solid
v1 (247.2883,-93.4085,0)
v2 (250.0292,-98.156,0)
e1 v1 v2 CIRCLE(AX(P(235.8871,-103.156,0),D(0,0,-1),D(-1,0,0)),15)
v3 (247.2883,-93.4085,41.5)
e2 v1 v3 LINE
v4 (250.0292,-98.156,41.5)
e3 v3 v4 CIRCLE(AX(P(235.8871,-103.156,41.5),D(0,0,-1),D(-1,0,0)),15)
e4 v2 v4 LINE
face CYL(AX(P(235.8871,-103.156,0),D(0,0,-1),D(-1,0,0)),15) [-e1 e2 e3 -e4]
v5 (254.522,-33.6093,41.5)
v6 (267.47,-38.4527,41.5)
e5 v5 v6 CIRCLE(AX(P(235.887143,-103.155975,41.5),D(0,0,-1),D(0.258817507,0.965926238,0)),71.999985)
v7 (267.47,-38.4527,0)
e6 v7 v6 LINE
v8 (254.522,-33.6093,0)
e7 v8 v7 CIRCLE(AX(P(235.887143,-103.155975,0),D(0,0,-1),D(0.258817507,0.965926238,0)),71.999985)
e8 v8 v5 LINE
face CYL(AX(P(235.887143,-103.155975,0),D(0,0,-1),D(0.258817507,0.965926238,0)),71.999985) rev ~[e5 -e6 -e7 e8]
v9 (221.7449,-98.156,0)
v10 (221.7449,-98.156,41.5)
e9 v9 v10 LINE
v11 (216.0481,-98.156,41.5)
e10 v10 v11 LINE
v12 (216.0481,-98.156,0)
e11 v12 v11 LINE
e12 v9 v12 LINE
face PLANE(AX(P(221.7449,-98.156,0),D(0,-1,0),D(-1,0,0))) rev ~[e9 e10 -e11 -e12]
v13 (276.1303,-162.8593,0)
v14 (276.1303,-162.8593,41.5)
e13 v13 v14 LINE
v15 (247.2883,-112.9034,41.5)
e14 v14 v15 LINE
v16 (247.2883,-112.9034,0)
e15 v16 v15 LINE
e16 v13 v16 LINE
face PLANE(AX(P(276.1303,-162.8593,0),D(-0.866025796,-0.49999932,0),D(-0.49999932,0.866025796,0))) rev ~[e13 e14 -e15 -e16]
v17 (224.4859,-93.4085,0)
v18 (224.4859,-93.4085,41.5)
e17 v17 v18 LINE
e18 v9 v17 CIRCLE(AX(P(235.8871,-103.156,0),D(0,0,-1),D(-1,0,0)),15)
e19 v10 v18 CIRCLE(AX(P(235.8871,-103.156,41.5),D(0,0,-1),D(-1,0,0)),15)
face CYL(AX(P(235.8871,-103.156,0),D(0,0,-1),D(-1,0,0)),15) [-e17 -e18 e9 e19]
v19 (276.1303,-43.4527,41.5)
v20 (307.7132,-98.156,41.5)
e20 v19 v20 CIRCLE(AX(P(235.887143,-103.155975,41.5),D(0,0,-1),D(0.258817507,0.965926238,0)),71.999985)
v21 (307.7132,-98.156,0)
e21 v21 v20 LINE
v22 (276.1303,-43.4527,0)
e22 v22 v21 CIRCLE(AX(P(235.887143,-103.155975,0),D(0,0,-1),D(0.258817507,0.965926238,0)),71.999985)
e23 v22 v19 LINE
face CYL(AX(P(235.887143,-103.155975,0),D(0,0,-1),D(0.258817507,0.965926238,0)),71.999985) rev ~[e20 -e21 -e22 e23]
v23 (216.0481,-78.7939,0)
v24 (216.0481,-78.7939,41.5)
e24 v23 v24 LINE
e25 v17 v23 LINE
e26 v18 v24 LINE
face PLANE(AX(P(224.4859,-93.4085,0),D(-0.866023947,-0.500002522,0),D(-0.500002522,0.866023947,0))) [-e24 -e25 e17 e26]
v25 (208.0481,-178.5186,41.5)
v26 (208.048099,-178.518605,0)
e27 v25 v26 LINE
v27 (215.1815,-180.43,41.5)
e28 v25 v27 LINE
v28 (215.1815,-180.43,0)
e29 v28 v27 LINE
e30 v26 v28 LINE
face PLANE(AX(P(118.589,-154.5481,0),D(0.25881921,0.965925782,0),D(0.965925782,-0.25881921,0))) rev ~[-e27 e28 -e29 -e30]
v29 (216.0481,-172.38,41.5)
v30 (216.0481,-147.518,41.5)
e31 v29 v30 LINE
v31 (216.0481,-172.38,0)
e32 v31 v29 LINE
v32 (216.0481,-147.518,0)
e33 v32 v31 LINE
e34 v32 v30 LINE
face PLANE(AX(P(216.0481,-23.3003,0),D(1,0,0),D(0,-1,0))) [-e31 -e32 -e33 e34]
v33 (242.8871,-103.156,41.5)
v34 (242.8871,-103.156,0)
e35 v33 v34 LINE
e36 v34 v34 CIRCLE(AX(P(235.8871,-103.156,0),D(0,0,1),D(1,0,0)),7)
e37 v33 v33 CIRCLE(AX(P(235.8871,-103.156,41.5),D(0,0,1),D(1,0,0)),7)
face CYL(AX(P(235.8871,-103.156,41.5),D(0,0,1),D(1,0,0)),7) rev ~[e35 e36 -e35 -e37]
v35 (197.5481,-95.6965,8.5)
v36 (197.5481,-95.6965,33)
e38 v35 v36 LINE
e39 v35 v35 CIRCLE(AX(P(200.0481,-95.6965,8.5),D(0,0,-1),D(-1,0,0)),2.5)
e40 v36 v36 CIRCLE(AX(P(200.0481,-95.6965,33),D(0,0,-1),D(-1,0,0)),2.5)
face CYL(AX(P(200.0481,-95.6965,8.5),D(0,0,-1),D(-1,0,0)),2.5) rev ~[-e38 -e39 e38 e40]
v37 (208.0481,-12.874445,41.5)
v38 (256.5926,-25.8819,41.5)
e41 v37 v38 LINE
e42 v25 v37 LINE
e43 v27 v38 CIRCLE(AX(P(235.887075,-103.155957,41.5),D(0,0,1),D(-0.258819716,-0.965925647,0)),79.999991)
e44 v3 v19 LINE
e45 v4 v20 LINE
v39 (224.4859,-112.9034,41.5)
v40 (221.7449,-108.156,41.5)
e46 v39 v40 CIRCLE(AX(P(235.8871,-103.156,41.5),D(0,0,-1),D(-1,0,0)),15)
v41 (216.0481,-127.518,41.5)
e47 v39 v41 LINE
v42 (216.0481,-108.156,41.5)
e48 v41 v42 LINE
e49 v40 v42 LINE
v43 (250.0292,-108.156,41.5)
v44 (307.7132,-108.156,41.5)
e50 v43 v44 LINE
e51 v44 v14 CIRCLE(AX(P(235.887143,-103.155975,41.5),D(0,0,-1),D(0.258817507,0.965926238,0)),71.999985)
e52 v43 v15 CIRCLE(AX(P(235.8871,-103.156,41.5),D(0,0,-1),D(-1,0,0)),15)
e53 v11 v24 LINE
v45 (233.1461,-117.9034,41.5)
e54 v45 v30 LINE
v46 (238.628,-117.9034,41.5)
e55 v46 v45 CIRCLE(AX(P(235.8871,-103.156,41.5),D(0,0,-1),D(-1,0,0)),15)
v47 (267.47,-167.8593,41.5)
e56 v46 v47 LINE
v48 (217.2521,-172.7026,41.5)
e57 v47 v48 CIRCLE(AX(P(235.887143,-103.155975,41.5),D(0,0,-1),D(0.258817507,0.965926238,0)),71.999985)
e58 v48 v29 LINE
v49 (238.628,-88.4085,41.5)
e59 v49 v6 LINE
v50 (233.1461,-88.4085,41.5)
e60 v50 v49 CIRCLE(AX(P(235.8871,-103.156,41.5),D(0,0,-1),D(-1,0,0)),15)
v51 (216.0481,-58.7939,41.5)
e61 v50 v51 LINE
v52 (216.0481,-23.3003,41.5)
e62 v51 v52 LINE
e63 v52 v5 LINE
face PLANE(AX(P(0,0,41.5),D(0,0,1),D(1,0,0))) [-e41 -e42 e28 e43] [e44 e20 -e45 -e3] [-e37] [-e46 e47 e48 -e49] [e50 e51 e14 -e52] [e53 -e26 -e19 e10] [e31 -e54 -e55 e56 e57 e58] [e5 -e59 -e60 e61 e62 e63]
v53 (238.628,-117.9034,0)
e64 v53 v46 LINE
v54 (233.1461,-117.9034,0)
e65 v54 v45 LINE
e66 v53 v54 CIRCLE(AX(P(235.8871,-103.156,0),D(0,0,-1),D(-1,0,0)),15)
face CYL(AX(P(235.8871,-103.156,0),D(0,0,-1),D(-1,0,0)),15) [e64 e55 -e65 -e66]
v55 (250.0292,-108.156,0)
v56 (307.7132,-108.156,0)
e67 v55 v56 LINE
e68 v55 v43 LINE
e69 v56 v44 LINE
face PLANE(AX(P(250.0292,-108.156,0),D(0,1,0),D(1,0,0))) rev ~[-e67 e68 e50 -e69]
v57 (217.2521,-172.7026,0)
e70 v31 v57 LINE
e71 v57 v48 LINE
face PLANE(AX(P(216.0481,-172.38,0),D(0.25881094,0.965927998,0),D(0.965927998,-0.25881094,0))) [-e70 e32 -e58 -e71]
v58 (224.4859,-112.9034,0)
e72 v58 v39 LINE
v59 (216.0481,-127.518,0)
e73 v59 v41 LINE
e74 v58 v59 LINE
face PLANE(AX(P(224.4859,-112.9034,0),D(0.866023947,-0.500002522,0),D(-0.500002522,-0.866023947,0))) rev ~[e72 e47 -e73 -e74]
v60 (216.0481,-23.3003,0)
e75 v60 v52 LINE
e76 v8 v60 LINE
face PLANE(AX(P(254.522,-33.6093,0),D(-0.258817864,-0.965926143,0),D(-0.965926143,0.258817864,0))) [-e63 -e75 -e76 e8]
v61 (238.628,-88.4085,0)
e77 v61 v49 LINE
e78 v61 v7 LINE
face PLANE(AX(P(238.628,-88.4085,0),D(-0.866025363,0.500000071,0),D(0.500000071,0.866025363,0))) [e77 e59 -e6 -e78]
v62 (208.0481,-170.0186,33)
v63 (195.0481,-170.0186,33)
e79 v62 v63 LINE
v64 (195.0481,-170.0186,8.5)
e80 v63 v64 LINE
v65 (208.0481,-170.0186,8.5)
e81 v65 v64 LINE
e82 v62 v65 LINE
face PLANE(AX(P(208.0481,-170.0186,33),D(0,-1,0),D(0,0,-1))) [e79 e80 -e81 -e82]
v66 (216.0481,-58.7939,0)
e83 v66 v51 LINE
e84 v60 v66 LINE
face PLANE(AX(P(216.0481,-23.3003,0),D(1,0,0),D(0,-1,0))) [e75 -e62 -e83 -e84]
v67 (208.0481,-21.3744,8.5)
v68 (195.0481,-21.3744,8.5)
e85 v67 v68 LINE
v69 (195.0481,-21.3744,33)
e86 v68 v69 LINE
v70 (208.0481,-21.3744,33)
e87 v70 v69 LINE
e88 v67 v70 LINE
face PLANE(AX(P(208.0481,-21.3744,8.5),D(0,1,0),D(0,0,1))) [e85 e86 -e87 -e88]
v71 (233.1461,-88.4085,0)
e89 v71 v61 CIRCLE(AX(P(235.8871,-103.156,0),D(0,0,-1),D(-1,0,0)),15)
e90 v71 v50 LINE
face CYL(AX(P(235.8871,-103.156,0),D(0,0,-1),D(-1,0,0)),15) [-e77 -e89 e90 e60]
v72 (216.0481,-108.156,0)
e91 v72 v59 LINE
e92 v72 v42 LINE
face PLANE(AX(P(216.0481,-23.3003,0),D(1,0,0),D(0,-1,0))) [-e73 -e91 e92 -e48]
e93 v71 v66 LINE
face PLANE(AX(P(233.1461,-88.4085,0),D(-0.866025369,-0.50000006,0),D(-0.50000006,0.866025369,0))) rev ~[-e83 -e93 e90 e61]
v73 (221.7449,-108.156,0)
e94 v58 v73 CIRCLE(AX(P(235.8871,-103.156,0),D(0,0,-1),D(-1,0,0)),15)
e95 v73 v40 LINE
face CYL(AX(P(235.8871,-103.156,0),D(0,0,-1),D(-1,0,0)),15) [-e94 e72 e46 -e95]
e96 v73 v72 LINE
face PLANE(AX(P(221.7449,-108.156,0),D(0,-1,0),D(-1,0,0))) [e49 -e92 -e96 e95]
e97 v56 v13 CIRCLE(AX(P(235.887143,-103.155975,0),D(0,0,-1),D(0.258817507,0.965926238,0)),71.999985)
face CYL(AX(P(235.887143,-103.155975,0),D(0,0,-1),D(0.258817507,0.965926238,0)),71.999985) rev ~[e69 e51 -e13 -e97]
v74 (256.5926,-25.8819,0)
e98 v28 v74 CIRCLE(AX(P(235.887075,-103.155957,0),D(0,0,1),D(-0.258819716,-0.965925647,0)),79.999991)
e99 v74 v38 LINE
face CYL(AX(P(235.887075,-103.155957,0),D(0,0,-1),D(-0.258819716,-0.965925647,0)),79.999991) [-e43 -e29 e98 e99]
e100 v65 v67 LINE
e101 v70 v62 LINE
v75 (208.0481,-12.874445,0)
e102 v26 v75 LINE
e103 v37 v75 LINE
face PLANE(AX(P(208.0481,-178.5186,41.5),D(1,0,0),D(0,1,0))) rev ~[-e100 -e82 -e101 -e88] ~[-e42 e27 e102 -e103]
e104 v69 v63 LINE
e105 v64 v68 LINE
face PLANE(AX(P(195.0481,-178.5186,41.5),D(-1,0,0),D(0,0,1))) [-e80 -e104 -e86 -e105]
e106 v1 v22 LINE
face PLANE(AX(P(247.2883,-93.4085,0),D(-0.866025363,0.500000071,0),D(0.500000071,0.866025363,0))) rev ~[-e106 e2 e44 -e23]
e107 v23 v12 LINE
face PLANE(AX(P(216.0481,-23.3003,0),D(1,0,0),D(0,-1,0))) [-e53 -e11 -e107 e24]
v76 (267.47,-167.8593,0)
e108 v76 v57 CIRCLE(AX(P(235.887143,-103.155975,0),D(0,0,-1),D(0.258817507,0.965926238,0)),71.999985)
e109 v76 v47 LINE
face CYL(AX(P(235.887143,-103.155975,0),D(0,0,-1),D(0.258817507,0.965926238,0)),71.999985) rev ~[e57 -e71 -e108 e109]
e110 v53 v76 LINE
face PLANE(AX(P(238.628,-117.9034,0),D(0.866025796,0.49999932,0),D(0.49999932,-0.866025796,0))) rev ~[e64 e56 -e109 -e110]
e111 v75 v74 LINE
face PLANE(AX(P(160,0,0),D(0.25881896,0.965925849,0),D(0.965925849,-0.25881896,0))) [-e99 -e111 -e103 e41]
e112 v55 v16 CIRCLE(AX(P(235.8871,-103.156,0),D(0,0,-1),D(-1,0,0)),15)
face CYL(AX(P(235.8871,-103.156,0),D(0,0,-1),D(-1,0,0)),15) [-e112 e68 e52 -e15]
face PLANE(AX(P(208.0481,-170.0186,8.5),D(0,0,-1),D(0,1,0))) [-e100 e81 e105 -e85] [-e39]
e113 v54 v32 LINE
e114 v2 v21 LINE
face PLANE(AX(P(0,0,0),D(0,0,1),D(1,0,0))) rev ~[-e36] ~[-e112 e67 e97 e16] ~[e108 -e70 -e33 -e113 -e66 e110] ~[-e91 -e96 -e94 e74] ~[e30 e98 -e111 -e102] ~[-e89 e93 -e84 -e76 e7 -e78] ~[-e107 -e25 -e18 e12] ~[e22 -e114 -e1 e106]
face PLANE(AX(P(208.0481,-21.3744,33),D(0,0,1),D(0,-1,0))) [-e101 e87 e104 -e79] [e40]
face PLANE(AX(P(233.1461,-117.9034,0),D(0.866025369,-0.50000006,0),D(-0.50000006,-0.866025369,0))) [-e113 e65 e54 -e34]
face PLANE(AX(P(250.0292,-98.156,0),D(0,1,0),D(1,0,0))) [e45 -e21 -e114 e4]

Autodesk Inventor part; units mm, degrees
ref_plane "YZ Plane" through (0, 0, 0) normal (1, 0, 0) x (0, 1, 0)
ref_plane "XZ Plane" through (0, 0, 0) normal (0, 1, 0) x (-1, 0, 0)
ref_plane "XY Plane" through (0, 0, 0) normal (0, 0, 1) x (1, 0, 0)
sketch "Sketch1" plane through (0, 0, 0) normal (0, 0, 1) x (1, 0, 0)
  line L0 (0, 0) -> (160, 0)
  line L1 (160, 0) -> (118.589, -154.5481) construction
  line L2 (0, 0) -> (41.411, -154.5481) construction
  line L3 (41.411, -154.5481) -> (118.589, -154.5481)
  circle A0 centre (235.8871, -103.156) radius 80 construction
  line L4 (160, 0) -> (256.5926, -25.8819)
  line L5 (118.589, -154.5481) -> (215.1815, -180.43)
  arc A1 (215.1815, -180.43) -> (256.5926, -25.8819) centre (235.8871, -103.156) ccw
  circle A2 centre (-75.8871, -103.156) radius 80 construction
  line L6 (0, 0) -> (-96.5926, -25.8819)
  line L7 (41.411, -154.5481) -> (-55.1815, -180.43)
  arc A3 (-96.5926, -25.8819) -> (-55.1815, -180.43) centre (-75.8871, -103.156) ccw
  dimension "d0" = 160
  dimension "d1" = 160
  dimension "d2" = 160
  dimension "d3" = 75
  dimension "d4" = 75
  dimension "d5" = 160
  dimension "d6" = 100
  dimension "d7" = 160
  dimension "d9" = 100
extrude "Extrusion1" add sketch "Sketch1" along normal blind 41.5
sketch "Sketch2" plane through (0, 0, 41.5) normal (0, 0, 1) x (1, 0, 0)
  line L0 (-26.5, -133) -> (186.5, -133)
  line L1 (186.5, -133) -> (186.5, -20)
  line L2 (186.5, -20) -> (-26.5, -20)
  line L3 (-26.5, -20) -> (-26.5, -133)
  line L4 (160, 0) -> (0, 0) projected
  point P0 (80, -20)
  point P1 (80, 0)
  dimension "d12" = 213
  dimension "d13" = 113
  dimension "d14" = 20
extrude "Extrusion2" cut sketch "Sketch2" against normal through all
sketch "Sketch3" plane through (0, 0, 41.5) normal (0, 0, 1) x (1, 0, 0)
  line L0 (-26.5, -133) -> (-26.5, -20) construction
  line L1 (-26.5, -20) -> (186.5, -20) construction
  line L2 (186.5, -20) -> (186.5, -133) construction
  line L3 (186.5, -133) -> (-26.5, -133) construction
  line L4 (-48.0481, 1.5481) -> (-48.0481, -154.5481) construction
  line L5 (-48.0481, -154.5481) -> (208.0481, -154.5481) construction
  line L6 (208.0481, -154.5481) -> (208.0481, 1.5481) construction
  line L7 (208.0481, 1.5481) -> (-48.0481, 1.5481) construction
  line L8 (41.411, -154.5481) -> (118.589, -154.5481) construction
  line L9 (-48.0481, 1.5481) -> (-48.0481, -178.5186) construction
  line L10 (-55.1815, -180.43) -> (41.411, -154.5481) construction
  line L11 (208.0481, 1.5481) -> (208.0481, -178.5186) construction
  line L12 (118.589, -154.5481) -> (215.1815, -180.43) construction
  line L13 (-48.0481, -178.5186) -> (208.0481, -178.5186) construction
  line L14 (-48.0481, 1.5481) -> (208.0481, 1.5481) construction
  line L15 (160, 0) -> (256.5926, -25.8819) construction
  line L16 (208.2963, -12.941) -> (208.0481, -178.5186)
  line L17 (208.2963, -12.941) -> (256.5926, -25.8819)
  line L18 (208.0481, -178.5186) -> (215.1815, -180.43)
  arc A0 (215.1815, -180.43) -> (256.5926, -25.8819) centre (235.8871, -103.156) ccw
  line L19 (208.0481, 1.5481) -> (-166.9519, 1.5481)
  line L20 (-166.9519, 1.5481) -> (-166.9519, -188.4519)
  line L21 (-166.9519, -188.4519) -> (208.0481, -188.4519)
  line L22 (208.0481, -188.4519) -> (208.0481, 1.5481)
  point P0 (0, 0)
  point P1 (80, -154.5481)
  dimension "d17" = 190
  dimension "d18" = 375
extrude "Extrusion3" cut sketch "Sketch3" against normal through all contours L22 L21 L20 L19
sketch "Sketch4" plane through (0, 0, 41.5) normal (0, 0, 1) x (1, 0, 0)
  arc A0 (215.1815, -180.43) -> (256.5926, -25.8819) centre (235.8871, -103.156) ccw projected
  circle A1 centre (235.8871, -103.156) radius 7
  point P0 (0, 0)
  dimension "d21" = 14
extrude "Extrusion4" cut sketch "Sketch4" against normal through all
sketch "Sketch5" plane through (208.0481, -178.5186, 41.5) normal (-1, 0, 0) x (0, 0, 1)
  line L0 (-41.5, 165.6442) -> (0, 165.6442) projected
  line L1 (-41.5, 0) -> (-41.5, 165.6442) projected
  line L2 (0, 0) -> (-41.5, 0) projected
  line L3 (0, 165.6442) -> (0, 0) projected
  line L4 (-33, 157.1442) -> (-8.5, 157.1442)
  line L5 (-8.5, 157.1442) -> (-8.5, 8.5)
  line L6 (-8.5, 8.5) -> (-33, 8.5)
  line L7 (-33, 8.5) -> (-33, 157.1442)
  point P0 (-41.5, 178.5186)
  dimension "d24" = 8.5
extrude "Extrusion5" add sketch "Sketch5" along normal blind 13 contours L4 L5 L6 L7
sketch "Sketch6" plane through (208.0481, -170.0186, 8.5) normal (0, 0, -1) x (-1, 0, 0)
  circle A0 centre (8, 74.3221) radius 2.5
  line L0 (0, -8.5) -> (0, 157.1442) projected
  point P0 (208.0481, 170.0186)
  point P1 (0, 74.3221)
  dimension "d27" = 5
  dimension "d28" = 8
extrude "Extrusion6" cut sketch "Sketch6" against normal through all
sketch "Sketch7" plane through (0, 0, 0) normal (0, 0, -1) x (-1, 0, 0)
  circle A0 centre (-235.8871, -103.156) radius 7 projected
  line L0 (-208.0481, -178.5186) -> (-208.0481, -12.8745) projected
  line L1 (-208.0481, -12.8745) -> (-256.5926, -25.8819) projected
  arc A1 (-256.5926, -25.8819) -> (-215.1815, -180.43) centre (-235.8871, -103.156) ccw projected
  line L2 (-215.1815, -180.43) -> (-208.0481, -178.5186) projected
  line L3 (-254.522, -33.6093) -> (-216.0481, -23.3003)
  line L4 (-216.0481, -23.3003) -> (-216.0481, -172.38)
  line L5 (-216.0481, -172.38) -> (-217.2521, -172.7026)
  arc A2 (-254.522, -33.6093) -> (-217.2521, -172.7026) centre (-235.8871, -103.156) ccw
  circle A3 centre (-235.8871, -103.156) radius 15
  point P0 (0, 0)
  dimension "d31" = 8
  dimension "d32" = 8
extrude "Extrusion7" cut sketch "Sketch7" against normal through all contours L3 L4 L5 A2
sketch "Sketch8" plane through (0, 0, 0) normal (0, 0, -1) x (-1, 0, 0)
  circle A0 centre (-235.8871, -103.156) radius 7 construction
  circle A1 centre (-235.8871, -103.156) radius 15 construction
  line L0 (-235.8871, -103.156) -> (-159.7277, -103.156) construction
  line L1 (-221.7449, -98.156) -> (-123.6167, -98.156) construction
  line L2 (-221.7449, -108.156) -> (-123.6167, -108.156) construction
  line L3 (-233.1461, -88.4085) -> (-184.082, -3.427) construction
  line L4 (-224.4859, -93.4085) -> (-175.4217, -8.427) construction
  line L5 (-247.2883, -93.4085) -> (-296.3524, -8.427) construction
  line L6 (-238.628, -88.4085) -> (-287.6921, -3.427) construction
  line L7 (-250.0292, -108.156) -> (-348.1575, -108.156) construction
  line L8 (-250.0292, -98.156) -> (-348.1575, -98.156) construction
  line L9 (-238.628, -117.9034) -> (-287.6921, -202.885) construction
  line L10 (-247.2883, -112.9034) -> (-296.3524, -197.885) construction
  line L11 (-224.4859, -112.9034) -> (-175.4217, -197.885) construction
  line L12 (-233.1461, -117.9034) -> (-184.082, -202.885) construction
  line L13 (-216.0481, -23.3003) -> (-216.0481, -172.38) construction
  arc A2 (-254.522, -33.6093) -> (-217.2521, -172.7026) centre (-235.8871, -103.156) ccw construction
  line L14 (-254.522, -33.6093) -> (-216.0481, -23.3003) construction
  line L15 (-216.0481, -172.38) -> (-217.2521, -172.7026) construction
  line L16 (-221.7449, -98.156) -> (-216.0481, -98.156)
  line L17 (-221.7449, -108.156) -> (-216.0481, -108.156)
  line L18 (-224.4859, -112.9034) -> (-216.0481, -127.518)
  line L19 (-233.1461, -117.9034) -> (-216.0481, -147.518)
  line L20 (-238.628, -117.9034) -> (-267.47, -167.8593)
  line L21 (-276.1303, -162.8593) -> (-247.2883, -112.9034)
  line L22 (-250.0292, -108.156) -> (-307.7132, -108.156)
  line L23 (-250.0292, -98.156) -> (-307.7132, -98.156)
  line L24 (-247.2883, -93.4085) -> (-276.1303, -43.4527)
  line L25 (-238.628, -88.4085) -> (-267.47, -38.4527)
  line L26 (-233.1461, -88.4085) -> (-216.0481, -58.7939)
  line L27 (-224.4859, -93.4085) -> (-216.0481, -78.7939)
  line L28 (-216.0481, -58.7939) -> (-216.0481, -78.7939)
  line L29 (-216.0481, -98.156) -> (-216.0481, -108.156)
  line L30 (-216.0481, -127.518) -> (-216.0481, -147.518)
  arc A3 (-267.47, -38.4527) -> (-276.1303, -43.4527) centre (-235.8871, -103.156) ccw
  arc A4 (-307.7132, -98.156) -> (-307.7132, -108.156) centre (-235.8871, -103.156) ccw
  arc A5 (-276.1303, -162.8593) -> (-267.47, -167.8593) centre (-235.8871, -103.156) ccw
  arc A6 (-221.7449, -108.156) -> (-221.7449, -98.156) centre (-235.8871, -103.156) ccw
  arc A7 (-233.1461, -117.9034) -> (-224.4859, -112.9034) centre (-235.8871, -103.156) ccw
  arc A8 (-247.2883, -112.9034) -> (-238.628, -117.9034) centre (-235.8871, -103.156) ccw
  arc A9 (-250.0292, -98.156) -> (-250.0292, -108.156) centre (-235.8871, -103.156) ccw
  arc A10 (-238.628, -88.4085) -> (-247.2883, -93.4085) centre (-235.8871, -103.156) ccw
  arc A11 (-224.4859, -93.4085) -> (-233.1461, -88.4085) centre (-235.8871, -103.156) ccw
  point P0 (0, 0)
  dimension "d36" = 5
  dimension "d37" = 5
  dimension "d40" = 360
extrude "Extrusion8" add sketch "Sketch8" against normal blind 41.5
properties part number "Riser Base" material "ABS Plastic"
